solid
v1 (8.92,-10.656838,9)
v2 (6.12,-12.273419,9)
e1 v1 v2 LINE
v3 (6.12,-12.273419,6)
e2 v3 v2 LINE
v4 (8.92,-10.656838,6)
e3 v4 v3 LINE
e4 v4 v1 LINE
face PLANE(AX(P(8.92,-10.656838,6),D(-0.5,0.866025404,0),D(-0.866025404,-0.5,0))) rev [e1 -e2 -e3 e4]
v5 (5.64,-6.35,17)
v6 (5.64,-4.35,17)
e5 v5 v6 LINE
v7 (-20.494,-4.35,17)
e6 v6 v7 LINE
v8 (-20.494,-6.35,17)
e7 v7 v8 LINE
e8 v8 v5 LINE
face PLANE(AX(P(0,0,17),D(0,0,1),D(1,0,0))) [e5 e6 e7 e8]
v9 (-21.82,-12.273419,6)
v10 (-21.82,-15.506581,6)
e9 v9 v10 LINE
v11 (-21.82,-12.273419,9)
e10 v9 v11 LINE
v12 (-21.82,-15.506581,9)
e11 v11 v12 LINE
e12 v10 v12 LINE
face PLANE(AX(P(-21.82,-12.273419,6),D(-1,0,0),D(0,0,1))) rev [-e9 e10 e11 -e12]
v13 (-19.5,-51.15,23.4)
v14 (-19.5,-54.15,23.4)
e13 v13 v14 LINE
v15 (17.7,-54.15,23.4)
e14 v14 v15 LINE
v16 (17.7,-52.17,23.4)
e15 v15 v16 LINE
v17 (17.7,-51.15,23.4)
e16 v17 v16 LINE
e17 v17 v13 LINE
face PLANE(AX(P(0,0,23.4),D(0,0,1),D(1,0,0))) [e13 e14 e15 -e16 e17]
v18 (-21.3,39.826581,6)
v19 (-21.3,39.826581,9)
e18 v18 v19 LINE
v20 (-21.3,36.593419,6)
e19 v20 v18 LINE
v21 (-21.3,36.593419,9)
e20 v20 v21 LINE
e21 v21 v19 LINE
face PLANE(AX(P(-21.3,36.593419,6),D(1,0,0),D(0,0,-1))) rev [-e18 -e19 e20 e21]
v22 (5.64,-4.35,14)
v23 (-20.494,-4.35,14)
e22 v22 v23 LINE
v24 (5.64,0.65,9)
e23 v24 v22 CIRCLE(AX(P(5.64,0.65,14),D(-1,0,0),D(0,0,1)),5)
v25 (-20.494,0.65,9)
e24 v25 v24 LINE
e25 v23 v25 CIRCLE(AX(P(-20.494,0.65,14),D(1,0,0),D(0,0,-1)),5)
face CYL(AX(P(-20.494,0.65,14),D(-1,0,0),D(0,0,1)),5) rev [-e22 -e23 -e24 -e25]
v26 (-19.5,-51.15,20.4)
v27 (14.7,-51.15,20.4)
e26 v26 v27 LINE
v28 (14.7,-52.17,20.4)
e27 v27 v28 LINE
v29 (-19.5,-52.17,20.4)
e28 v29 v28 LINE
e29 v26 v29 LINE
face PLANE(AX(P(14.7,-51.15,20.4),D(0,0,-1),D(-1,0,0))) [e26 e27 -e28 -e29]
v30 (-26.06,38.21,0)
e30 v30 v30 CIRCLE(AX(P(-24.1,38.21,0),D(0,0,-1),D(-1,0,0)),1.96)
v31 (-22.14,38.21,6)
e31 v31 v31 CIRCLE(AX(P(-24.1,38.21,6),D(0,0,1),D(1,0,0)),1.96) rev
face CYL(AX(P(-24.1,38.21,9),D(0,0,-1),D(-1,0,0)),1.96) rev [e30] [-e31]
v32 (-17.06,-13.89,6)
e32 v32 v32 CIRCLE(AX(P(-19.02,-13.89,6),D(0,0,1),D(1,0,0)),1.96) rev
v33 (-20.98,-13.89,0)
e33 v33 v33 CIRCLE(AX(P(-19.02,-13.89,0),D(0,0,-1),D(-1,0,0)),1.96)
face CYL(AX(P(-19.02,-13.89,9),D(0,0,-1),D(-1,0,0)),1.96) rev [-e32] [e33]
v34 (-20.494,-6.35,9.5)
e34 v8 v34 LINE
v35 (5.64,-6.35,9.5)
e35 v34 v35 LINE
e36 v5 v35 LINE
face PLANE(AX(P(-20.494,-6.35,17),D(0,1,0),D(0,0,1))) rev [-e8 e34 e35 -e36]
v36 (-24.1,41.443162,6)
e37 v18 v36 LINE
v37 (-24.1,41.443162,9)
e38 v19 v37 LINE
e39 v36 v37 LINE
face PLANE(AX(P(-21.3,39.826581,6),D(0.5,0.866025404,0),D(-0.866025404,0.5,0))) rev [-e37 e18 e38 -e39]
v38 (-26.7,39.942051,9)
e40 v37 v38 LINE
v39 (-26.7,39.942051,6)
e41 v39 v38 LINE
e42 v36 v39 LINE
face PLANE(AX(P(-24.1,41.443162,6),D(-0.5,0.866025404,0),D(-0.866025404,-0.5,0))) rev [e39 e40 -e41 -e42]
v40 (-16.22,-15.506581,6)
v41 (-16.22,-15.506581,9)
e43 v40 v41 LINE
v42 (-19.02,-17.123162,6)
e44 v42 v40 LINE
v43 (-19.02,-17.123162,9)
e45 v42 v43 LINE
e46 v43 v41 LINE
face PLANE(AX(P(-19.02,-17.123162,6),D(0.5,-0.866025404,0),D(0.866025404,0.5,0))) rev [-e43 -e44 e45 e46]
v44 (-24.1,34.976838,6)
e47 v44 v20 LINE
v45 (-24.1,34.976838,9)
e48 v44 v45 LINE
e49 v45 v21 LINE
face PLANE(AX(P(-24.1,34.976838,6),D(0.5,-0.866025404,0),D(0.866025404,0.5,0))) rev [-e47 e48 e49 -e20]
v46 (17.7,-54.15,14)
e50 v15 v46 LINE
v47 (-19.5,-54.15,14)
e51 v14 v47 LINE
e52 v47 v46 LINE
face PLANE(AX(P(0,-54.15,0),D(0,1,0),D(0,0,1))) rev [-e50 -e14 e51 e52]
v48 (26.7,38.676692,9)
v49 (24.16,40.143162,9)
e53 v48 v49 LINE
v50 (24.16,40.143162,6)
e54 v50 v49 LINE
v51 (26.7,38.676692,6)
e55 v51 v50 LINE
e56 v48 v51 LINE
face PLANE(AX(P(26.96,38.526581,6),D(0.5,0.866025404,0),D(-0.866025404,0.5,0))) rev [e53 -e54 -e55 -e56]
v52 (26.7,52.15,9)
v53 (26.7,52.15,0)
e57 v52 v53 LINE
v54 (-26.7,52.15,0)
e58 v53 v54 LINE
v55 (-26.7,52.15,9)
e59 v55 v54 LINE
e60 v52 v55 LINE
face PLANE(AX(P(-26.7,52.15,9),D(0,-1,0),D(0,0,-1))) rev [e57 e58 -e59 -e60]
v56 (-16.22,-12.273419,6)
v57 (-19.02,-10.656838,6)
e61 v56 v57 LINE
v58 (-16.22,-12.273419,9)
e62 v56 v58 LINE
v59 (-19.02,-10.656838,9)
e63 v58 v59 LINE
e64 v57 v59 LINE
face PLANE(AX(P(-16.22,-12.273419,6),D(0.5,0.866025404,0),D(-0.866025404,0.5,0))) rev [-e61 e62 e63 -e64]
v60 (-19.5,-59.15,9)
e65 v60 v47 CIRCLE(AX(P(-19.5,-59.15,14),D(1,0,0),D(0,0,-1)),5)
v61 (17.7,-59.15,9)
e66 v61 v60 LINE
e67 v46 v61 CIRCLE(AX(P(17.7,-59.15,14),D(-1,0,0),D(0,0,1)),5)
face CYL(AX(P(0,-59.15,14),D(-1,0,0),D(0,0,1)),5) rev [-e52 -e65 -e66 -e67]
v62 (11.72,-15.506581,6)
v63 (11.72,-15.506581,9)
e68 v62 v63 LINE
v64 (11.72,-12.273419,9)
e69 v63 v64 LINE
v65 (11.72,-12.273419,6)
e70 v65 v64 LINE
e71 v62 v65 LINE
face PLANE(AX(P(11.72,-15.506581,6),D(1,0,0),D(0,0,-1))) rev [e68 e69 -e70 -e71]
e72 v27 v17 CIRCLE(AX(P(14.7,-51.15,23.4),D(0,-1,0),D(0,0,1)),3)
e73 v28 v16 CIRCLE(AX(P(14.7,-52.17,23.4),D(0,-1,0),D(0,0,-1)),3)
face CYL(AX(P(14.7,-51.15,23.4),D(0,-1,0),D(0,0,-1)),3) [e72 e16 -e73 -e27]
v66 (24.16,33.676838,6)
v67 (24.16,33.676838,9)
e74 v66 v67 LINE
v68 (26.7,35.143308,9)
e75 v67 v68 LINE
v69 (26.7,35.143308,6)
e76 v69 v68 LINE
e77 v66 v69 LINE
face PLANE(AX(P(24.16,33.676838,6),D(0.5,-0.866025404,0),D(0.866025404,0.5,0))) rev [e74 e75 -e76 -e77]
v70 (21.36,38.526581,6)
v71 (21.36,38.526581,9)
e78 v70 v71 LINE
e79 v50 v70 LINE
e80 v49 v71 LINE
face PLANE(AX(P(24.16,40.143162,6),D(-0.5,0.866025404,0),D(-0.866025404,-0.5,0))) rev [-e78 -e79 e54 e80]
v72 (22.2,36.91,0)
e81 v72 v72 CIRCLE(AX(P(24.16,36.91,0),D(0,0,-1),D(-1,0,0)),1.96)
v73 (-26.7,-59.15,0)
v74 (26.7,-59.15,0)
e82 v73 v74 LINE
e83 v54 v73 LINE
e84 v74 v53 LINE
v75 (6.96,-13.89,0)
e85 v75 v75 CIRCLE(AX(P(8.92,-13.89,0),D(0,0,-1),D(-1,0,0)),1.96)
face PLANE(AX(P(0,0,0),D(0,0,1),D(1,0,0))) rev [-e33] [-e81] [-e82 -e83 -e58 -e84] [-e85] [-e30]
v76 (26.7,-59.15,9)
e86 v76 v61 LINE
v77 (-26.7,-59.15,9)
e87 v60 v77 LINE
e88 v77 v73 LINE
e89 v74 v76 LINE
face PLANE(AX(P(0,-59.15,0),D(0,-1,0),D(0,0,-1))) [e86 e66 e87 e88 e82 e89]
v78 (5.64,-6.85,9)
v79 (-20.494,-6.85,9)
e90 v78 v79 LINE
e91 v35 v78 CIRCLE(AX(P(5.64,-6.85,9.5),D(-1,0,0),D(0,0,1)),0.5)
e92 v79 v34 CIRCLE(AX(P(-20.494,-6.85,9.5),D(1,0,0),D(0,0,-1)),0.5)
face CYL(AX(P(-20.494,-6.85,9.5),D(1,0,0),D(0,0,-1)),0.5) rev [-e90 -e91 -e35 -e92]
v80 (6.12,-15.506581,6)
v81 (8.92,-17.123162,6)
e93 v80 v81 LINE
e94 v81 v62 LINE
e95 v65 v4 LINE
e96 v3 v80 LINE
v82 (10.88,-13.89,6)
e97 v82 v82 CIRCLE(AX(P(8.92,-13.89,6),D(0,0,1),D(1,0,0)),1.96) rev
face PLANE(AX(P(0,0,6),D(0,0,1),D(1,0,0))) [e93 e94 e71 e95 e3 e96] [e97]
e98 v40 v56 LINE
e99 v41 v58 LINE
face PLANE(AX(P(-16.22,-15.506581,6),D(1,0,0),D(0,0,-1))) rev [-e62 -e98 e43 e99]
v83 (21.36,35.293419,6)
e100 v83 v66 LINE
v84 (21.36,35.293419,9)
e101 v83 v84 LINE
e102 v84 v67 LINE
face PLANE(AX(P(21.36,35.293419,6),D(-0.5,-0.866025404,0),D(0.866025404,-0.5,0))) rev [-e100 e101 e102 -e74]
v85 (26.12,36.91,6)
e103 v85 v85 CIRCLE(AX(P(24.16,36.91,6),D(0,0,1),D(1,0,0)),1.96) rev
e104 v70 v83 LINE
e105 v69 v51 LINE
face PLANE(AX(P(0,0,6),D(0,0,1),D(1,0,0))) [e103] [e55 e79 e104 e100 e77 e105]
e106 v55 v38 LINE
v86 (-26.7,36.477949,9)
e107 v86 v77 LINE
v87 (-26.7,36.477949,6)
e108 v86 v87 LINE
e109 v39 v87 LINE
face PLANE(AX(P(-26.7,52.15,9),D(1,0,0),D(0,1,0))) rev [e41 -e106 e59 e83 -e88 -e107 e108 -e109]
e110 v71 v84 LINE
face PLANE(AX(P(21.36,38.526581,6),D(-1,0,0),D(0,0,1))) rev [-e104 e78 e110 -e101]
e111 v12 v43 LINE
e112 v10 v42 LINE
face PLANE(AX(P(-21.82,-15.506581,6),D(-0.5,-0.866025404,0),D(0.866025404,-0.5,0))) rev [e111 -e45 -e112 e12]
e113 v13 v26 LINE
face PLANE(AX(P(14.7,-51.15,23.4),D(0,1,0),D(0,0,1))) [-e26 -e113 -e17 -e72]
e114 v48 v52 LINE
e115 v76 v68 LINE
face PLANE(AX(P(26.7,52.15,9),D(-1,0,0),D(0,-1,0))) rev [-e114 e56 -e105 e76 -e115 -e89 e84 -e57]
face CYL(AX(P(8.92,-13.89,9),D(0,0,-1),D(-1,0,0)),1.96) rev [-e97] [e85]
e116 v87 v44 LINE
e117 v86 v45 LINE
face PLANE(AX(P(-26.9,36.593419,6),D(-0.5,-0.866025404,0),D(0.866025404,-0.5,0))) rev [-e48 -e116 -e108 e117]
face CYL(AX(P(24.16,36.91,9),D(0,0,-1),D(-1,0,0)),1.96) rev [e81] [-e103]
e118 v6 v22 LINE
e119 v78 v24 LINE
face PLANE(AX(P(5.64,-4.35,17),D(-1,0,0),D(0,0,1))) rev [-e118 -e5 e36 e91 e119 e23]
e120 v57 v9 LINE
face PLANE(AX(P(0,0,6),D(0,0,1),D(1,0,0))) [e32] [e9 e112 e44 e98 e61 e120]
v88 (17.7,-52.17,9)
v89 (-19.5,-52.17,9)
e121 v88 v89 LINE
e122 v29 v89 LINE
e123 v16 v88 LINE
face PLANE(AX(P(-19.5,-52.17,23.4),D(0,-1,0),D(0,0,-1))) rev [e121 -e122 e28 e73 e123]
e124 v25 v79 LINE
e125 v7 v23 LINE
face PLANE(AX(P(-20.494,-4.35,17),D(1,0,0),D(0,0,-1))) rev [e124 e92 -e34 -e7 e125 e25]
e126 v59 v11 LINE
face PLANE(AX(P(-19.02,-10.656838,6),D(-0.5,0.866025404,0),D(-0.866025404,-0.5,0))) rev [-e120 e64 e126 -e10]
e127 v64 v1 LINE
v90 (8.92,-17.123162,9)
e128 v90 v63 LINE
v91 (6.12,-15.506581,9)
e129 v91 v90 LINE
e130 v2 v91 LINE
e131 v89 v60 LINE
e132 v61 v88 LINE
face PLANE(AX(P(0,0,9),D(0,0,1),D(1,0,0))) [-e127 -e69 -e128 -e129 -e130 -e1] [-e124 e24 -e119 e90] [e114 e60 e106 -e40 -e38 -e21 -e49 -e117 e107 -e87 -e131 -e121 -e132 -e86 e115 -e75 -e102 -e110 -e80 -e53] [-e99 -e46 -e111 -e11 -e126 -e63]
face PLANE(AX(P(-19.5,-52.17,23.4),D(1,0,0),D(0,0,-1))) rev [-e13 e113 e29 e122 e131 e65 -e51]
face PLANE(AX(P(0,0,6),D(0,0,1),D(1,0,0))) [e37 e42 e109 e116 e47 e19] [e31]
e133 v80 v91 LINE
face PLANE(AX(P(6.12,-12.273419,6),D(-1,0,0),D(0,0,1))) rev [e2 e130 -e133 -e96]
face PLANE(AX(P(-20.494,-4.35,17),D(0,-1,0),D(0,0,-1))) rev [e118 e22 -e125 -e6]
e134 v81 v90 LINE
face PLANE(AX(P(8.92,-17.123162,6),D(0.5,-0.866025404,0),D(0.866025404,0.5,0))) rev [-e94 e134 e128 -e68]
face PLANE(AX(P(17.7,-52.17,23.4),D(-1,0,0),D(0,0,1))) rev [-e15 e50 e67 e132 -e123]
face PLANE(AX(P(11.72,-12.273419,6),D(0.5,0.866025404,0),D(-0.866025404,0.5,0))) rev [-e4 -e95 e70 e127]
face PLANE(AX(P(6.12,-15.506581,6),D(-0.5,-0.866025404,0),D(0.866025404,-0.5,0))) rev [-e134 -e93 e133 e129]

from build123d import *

# Parameters (mm, degrees)
SKETCH2_W           = 53.4
SKETCH2_H           = 104.3
BOSS_EXTRUDE1_DEPTH = 9
SKETCH3_R           = 1.96
CUT_EXTRUDE1_DEPTH  = 60.274889287
SKETCH4_W           = 26.134
SKETCH4_H           = 2
BOSS_EXTRUDE2_DEPTH = 8
FILLET1_R           = 0.5
CUT_EXTRUDE3_DEPTH  = 3
SKETCH8_W           = 53.4
SKETCH8_H           = 9
BOSS_EXTRUDE4_DEPTH = 2
SKETCH9_W           = 37.2
SKETCH9_H           = 1.98
BOSS_EXTRUDE5_DEPTH = 14.4
BOSS_EXTRUDE6_DEPTH = 3
FILLET2_R           = 5
SKETCH13_W          = 53.4
SKETCH13_H          = 9
BOSS_EXTRUDE8_DEPTH = 5
FILLET3_R           = 5


with BuildPart() as part:
    # Sketch2 → Boss-Extrude1 (new body)
    with BuildSketch(Plane.XY):
        Rectangle(SKETCH2_W, SKETCH2_H)
    extrude(amount=BOSS_EXTRUDE1_DEPTH)

    # Sketch3 → Cut-Extrude1 (cut, through all)
    with BuildSketch(Plane(origin=(0, 0, 0), x_dir=(-1, 0, 0), z_dir=(0, 0, -1))):
        with Locations((24.1, 38.21)):
            Circle(SKETCH3_R)
        with Locations((-24.16, 36.91)):
            Circle(SKETCH3_R)
        with Locations((-8.92, -13.89)):
            Circle(SKETCH3_R)
        with Locations((19.02, -13.89)):
            Circle(SKETCH3_R)
    extrude(amount=-CUT_EXTRUDE1_DEPTH, mode=Mode.SUBTRACT)

    # Sketch4 → Boss-Extrude2 (add)
    with BuildSketch(Plane.XY.offset(9)):
        with Locations((-7.427, -5.35)):
            Rectangle(SKETCH4_W, SKETCH4_H)
    extrude(amount=BOSS_EXTRUDE2_DEPTH)

    # Fillet1
    fillet1_edges = [part.edges().sort_by_distance(p)[0] for p in [
        (-7.427, -6.35, 9),
    ]]
    fillet(fillet1_edges, radius=FILLET1_R)

    # Sketch6 → Cut-Extrude3 (cut)
    with BuildSketch(Plane.XY.offset(9)):
        Polygon((-21.3, 36.593419246), (-21.3, 39.826580754), (-24.1, 41.443161507), (-26.9, 39.826580754), (-26.9, 36.593419246), (-24.1, 34.976838493), align=None)
        Polygon((26.96, 35.293419246), (26.96, 38.526580754), (24.16, 40.143161507), (21.36, 38.526580754), (21.36, 35.293419246), (24.16, 33.676838493), align=None)
        Polygon((-16.22, -15.506580754), (-16.22, -12.273419246), (-19.02, -10.656838493), (-21.82, -12.273419246), (-21.82, -15.506580754), (-19.02, -17.123161507), align=None)
        Polygon((11.72, -15.506580754), (11.72, -12.273419246), (8.92, -10.656838493), (6.12, -12.273419246), (6.12, -15.506580754), (8.92, -17.123161507), align=None)
    extrude(amount=-CUT_EXTRUDE3_DEPTH, mode=Mode.SUBTRACT)

    # Sketch8 → Boss-Extrude4 (add)
    with BuildSketch(Plane.XZ.offset(52.15)):
        with Locations((0, 4.5)):
            Rectangle(SKETCH8_W, SKETCH8_H)
    extrude(amount=BOSS_EXTRUDE4_DEPTH)

    # Sketch9 → Boss-Extrude5 (add)
    with BuildSketch(Plane.XY.offset(9)):
        with Locations((-0.9, -53.16)):
            Rectangle(SKETCH9_W, SKETCH9_H)
    extrude(amount=BOSS_EXTRUDE5_DEPTH)

    # Sketch10 → Boss-Extrude6 (add)
    with BuildSketch(Plane.XZ.offset(54.15)):
        with BuildLine():
            Line((14.7, 20.4), (-19.5, 20.4))
            Line((-19.5, 20.4), (-19.5, 23.4))
            Line((-19.5, 23.4), (17.7, 23.4))
            ThreePointArc((17.7, 23.4), (16.821320344, 21.278679656), (14.7, 20.4))
        make_face()
    extrude(amount=-BOSS_EXTRUDE6_DEPTH)

    # Fillet2
    fillet2_edges = [part.edges().sort_by_distance(p)[0] for p in [
        (-7.427, -4.35, 9),
    ]]
    fillet(fillet2_edges, radius=FILLET2_R)

    # Sketch13 → Boss-Extrude8 (add)
    with BuildSketch(Plane.XZ.offset(54.15)):
        with Locations((0, 4.5)):
            Rectangle(SKETCH13_W, SKETCH13_H)
    extrude(amount=BOSS_EXTRUDE8_DEPTH)

    # Fillet3
    fillet3_edges = [part.edges().sort_by_distance(p)[0] for p in [
        (-0.9, -54.15, 9),
    ]]
    fillet(fillet3_edges, radius=FILLET3_R - 0.0001)  # a hair under: the kernel refuses the full size


solid = part.part
